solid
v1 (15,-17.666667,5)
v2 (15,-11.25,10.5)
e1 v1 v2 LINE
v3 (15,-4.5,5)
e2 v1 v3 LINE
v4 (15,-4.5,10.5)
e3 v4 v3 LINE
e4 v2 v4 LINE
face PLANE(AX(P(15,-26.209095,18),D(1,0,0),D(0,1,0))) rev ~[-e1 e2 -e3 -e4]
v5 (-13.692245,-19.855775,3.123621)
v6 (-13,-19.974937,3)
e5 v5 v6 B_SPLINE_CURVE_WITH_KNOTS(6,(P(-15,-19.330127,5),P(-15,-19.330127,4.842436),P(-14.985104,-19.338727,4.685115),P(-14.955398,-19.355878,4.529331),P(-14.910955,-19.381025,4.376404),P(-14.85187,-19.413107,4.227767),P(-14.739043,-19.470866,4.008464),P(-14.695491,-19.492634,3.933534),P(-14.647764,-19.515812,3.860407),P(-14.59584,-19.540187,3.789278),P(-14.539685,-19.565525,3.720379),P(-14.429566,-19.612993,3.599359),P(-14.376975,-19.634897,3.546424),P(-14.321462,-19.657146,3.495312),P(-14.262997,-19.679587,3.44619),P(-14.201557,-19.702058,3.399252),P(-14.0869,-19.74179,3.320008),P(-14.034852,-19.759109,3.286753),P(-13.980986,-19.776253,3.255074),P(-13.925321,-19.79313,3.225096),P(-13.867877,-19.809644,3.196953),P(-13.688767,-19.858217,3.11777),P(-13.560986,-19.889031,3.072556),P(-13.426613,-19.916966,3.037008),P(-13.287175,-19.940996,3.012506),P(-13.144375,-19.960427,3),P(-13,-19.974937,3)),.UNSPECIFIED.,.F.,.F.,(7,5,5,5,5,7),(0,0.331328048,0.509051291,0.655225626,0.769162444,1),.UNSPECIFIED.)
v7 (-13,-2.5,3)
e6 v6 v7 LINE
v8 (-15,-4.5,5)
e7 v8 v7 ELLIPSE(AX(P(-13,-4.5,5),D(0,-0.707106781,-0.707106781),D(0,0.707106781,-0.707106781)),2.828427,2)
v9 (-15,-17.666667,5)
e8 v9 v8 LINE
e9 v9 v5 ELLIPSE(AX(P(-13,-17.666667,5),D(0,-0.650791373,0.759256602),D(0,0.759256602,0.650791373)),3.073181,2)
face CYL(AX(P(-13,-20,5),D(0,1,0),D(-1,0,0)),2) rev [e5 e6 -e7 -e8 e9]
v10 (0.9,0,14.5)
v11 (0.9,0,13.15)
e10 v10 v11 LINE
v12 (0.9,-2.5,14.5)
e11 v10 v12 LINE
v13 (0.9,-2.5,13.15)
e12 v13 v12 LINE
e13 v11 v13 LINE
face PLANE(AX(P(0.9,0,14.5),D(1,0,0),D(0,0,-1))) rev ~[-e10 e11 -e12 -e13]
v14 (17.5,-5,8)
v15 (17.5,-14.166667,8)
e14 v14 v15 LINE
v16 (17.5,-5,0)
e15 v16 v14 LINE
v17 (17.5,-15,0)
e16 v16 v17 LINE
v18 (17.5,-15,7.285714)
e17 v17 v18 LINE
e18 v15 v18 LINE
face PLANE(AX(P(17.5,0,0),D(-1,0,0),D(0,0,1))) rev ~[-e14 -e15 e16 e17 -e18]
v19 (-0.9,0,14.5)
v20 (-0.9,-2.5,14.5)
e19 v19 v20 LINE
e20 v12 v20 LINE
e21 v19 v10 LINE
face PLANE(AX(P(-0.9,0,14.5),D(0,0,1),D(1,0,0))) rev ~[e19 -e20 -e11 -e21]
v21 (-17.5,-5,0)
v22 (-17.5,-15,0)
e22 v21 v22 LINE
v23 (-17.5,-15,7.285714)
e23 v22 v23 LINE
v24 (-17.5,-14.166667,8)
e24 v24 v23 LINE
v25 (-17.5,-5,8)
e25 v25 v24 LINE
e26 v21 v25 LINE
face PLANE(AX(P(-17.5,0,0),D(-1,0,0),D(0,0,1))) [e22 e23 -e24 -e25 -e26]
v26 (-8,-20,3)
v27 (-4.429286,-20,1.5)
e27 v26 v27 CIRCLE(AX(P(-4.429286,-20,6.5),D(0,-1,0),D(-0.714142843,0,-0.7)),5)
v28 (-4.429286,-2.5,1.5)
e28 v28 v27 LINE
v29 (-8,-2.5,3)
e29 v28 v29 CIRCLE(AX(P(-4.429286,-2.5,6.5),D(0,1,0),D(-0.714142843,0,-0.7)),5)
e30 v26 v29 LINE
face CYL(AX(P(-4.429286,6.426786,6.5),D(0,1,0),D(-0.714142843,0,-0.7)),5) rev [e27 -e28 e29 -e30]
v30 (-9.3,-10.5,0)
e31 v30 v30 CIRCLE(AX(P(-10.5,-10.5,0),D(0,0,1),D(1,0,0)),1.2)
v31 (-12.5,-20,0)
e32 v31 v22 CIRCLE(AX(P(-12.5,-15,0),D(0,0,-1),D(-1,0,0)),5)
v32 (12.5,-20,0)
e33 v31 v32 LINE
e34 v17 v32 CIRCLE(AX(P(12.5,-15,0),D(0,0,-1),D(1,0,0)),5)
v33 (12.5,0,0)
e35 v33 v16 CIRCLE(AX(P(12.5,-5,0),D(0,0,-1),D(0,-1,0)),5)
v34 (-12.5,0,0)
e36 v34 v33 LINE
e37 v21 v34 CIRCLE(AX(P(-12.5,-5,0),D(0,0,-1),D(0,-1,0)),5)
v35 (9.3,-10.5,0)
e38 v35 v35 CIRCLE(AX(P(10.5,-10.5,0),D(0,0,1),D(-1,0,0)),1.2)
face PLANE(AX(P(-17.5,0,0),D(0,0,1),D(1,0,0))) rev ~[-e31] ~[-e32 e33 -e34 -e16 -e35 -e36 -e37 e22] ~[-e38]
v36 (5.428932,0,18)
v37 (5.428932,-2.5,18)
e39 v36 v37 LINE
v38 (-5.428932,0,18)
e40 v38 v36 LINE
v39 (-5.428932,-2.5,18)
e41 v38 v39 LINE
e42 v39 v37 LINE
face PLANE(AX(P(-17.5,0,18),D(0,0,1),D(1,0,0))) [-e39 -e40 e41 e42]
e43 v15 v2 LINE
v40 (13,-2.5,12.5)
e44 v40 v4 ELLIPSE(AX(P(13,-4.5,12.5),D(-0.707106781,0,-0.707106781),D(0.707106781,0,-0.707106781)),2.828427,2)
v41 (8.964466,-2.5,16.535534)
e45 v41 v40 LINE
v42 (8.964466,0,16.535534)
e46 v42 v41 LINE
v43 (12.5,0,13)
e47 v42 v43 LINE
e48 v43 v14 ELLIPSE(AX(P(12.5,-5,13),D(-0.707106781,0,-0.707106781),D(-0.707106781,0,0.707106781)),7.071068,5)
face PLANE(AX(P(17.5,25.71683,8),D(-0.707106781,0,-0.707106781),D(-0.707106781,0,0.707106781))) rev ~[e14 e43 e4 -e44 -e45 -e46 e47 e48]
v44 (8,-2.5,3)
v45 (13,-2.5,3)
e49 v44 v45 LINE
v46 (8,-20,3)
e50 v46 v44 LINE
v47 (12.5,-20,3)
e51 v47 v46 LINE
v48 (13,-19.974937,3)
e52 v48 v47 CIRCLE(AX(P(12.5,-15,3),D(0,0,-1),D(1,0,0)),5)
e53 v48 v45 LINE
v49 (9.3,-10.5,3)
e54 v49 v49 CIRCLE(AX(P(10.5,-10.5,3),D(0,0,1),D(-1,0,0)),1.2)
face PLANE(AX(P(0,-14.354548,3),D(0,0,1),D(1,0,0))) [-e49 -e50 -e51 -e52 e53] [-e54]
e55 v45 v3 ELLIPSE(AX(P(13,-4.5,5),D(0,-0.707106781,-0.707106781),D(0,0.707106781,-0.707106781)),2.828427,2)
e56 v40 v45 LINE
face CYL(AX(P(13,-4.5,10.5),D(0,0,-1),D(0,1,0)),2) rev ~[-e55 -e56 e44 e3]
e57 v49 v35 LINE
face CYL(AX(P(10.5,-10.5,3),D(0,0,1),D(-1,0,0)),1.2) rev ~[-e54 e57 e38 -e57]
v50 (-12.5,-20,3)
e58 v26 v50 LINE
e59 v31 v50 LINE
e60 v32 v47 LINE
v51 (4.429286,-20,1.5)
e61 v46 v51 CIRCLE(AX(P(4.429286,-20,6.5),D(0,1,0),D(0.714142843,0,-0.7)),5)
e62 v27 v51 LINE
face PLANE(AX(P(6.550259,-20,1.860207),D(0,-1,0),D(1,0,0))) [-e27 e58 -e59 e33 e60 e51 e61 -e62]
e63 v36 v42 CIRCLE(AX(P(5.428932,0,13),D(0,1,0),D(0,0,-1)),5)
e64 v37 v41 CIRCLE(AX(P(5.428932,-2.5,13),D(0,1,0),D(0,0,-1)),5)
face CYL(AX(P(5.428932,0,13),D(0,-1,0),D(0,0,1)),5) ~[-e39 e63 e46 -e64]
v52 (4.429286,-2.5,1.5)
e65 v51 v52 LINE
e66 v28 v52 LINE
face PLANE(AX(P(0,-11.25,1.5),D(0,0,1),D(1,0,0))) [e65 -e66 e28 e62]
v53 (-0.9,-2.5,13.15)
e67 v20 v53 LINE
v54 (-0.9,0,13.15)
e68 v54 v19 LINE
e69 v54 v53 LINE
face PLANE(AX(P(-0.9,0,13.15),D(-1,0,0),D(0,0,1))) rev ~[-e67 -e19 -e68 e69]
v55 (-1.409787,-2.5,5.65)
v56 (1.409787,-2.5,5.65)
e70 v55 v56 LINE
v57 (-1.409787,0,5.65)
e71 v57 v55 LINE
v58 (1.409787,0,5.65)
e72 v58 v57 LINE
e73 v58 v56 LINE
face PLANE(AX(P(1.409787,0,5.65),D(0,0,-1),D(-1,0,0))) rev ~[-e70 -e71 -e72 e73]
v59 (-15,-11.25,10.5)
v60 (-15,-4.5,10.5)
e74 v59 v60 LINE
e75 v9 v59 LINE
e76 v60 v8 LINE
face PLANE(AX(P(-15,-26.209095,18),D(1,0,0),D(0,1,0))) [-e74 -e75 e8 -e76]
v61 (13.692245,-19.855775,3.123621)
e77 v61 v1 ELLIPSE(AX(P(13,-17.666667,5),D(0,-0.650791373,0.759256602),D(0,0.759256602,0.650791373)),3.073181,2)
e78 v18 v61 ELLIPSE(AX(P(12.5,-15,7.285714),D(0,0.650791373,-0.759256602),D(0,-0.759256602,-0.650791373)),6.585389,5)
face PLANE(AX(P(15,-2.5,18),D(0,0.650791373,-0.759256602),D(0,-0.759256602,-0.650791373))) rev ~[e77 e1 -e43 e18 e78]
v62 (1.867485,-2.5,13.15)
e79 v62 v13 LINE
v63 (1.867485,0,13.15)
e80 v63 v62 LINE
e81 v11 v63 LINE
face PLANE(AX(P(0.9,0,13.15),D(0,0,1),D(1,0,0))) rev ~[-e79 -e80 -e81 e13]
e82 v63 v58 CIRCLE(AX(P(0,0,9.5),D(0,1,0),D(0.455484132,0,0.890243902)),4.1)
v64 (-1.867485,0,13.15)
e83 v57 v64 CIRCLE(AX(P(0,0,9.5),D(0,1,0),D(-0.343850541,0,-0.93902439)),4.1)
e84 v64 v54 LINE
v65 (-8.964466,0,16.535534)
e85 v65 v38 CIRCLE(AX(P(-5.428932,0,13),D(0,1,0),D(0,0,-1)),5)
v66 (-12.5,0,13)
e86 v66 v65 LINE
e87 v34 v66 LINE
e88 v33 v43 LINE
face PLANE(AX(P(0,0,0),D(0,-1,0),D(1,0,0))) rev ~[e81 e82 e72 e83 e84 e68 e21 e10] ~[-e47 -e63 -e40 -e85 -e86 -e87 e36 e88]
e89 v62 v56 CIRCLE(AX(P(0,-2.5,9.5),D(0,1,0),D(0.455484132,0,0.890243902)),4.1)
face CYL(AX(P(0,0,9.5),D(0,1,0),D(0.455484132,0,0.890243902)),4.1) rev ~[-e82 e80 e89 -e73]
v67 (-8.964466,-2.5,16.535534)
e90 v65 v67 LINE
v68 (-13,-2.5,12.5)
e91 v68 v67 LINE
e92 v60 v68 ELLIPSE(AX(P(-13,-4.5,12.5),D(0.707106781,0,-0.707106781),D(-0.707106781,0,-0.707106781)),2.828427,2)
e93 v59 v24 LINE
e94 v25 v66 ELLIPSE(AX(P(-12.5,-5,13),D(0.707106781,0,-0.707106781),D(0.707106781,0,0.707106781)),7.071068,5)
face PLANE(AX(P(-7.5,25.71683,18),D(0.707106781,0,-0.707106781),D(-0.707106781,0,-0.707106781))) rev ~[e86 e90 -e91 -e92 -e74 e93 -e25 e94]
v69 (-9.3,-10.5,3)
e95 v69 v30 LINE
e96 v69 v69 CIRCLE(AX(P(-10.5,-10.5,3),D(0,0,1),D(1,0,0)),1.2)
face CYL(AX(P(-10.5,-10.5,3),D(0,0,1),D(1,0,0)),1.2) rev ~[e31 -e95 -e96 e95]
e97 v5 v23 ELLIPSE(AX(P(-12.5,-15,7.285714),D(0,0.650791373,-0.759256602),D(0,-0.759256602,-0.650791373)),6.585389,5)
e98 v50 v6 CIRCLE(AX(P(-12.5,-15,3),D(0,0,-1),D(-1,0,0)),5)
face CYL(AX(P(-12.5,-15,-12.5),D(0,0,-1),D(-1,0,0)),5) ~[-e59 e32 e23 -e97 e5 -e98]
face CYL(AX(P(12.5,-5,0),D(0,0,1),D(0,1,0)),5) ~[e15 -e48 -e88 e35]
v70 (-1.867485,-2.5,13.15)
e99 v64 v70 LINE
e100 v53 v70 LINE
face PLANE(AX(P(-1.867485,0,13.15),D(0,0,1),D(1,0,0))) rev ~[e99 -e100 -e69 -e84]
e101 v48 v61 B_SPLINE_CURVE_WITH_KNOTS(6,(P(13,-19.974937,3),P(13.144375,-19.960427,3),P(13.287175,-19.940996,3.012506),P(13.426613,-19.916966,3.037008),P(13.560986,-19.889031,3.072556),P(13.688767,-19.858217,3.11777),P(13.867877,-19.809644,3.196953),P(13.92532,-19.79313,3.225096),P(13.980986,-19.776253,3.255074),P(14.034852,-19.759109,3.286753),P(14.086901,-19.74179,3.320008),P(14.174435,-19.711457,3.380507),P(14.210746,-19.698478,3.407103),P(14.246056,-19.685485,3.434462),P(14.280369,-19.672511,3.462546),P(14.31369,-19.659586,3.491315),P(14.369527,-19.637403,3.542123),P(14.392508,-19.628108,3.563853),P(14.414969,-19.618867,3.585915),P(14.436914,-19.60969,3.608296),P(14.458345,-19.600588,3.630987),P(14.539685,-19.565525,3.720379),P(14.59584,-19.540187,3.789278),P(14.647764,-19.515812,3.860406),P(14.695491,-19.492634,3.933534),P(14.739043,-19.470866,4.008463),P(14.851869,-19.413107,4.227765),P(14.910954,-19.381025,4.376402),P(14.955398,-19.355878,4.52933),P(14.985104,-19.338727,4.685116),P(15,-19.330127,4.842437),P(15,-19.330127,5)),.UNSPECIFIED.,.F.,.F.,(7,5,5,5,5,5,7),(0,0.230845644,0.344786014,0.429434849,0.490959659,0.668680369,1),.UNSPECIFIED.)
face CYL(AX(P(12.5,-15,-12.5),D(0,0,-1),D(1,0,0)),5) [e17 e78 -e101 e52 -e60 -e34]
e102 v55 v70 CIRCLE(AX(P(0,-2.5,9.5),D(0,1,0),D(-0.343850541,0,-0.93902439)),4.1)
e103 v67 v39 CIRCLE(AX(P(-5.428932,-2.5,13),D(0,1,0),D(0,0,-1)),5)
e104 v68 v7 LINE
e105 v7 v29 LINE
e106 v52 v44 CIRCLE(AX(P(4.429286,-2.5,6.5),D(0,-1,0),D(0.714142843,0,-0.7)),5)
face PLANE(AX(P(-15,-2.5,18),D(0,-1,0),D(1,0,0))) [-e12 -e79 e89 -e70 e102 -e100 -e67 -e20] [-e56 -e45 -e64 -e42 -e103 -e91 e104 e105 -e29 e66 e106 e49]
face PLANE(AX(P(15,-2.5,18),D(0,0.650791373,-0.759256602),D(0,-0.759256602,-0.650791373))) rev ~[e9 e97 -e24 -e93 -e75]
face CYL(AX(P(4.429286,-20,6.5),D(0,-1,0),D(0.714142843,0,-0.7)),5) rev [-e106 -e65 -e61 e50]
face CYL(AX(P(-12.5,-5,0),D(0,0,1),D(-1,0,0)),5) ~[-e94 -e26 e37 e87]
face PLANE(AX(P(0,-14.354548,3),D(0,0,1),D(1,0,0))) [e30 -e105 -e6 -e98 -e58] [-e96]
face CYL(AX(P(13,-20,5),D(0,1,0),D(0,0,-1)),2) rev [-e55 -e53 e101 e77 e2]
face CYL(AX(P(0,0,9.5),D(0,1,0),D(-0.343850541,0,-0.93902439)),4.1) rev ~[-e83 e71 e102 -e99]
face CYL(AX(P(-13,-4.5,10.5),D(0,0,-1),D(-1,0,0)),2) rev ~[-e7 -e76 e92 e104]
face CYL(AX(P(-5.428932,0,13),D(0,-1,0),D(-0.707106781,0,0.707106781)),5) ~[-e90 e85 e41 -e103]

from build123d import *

# Parameters (mm, degrees)
F0_W          = 35
F0_H          = 18
F1_DEPTH      = 20
F2_W          = 30
F2_H          = 23.709095493
F3_DEPTH      = 15
F5_DEPTH      = 32.5
F6_T1_DEPTH   = 53.9336597593
F7_R          = 2
F10_DEPTH     = 25
F11_R         = 5
F12_W         = 16
F12_H         = 17.5
F13_DEPTH     = 1.5
F14_T4_DEPTH  = 26.4267855357
F14_T9_DEPTH  = 26.4267855357
F14_T11_DEPTH = 28
F14_T13_DEPTH = 28
F15_R         = 1.2
F16_DEPTH     = 3.0010001


# Not quite as in the source:
# - a fillet or chamfer that OpenCascade refuses, or shapes differently, is made with other operations: its cross-section is extruded or revolved along the edge and cut away or added


with BuildPart() as f1:
    # F0 (on Front) → F1 (new body)
    with BuildSketch(Plane.XZ):
        with Locations((0, 9)):
            Rectangle(F0_W, F0_H)
    extrude(amount=F1_DEPTH)

    # F2 (on face) → F3 (cut)
    with BuildSketch(Plane.XY.offset(18)):
        with Locations((0, -14.3545477465)):
            Rectangle(F2_W, F2_H)
    extrude(amount=-F3_DEPTH, mode=Mode.SUBTRACT)

    # F4 (on face) → F5 (cut, symmetric)
    with BuildSketch(Plane(origin=(15, 0, 0), x_dir=(0, -1, 0), z_dir=(-1, 0, 0))):
        Polygon((20, 18), (2.5, 18), (20, 3), align=None)
    extrude(amount=F5_DEPTH, both=True, mode=Mode.SUBTRACT)

    # F6: chamfer of 10 on 2 edges, made by hand

    # F6_s2 → F6_t1 (cut)
    with BuildSketch(Plane.XZ.offset(-25.7168298797)):
        Polygon((17.5, 8), (7.5, 18), (17.5, 18), align=None)
        Polygon((-7.5, 18), (-17.5, 8), (-17.5, 18), align=None)
    extrude(amount=F6_T1_DEPTH, mode=Mode.SUBTRACT)

    # F7
    f7_edges = [f1.edges().sort_by_distance(p)[0] for p in [
        (-15, -2.5, 6.75),
        (15, -2.5, 6.75),
        (-15, -11.25, 3),
        (15, -11.25, 3),
    ]]
    fillet(f7_edges, radius=F7_R)

    # F8 (on face) → F10 (cut)
    with BuildSketch(Plane(origin=(0, 0, 0), x_dir=(-1, 0, 0), z_dir=(0, 1, 0))):
        with BuildLine():
            Line((-1.409787218, 5.65), (1.409787218, 5.65))
            ThreePointArc((1.409787218, 5.65), (4.0923866141, 9.2502565294), (1.8674849397, 13.15))
            Line((1.8674849397, 13.15), (0.9, 13.15))
            Line((0.9, 13.15), (0.9, 14.5))
            Line((0.9, 14.5), (-0.9, 14.5))
            Line((-0.9, 14.5), (-0.9, 13.15))
            Line((-0.9, 13.15), (-1.8674849397, 13.15))
            ThreePointArc((-1.8674849397, 13.15), (-4.0923866141, 9.2502565294), (-1.409787218, 5.65))
        make_face()
    extrude(amount=-F10_DEPTH, mode=Mode.SUBTRACT)

    # F11
    f11_edges = [f1.edges().sort_by_distance(p)[0] for p in [
        (7.5, -1.25, 18),
        (-7.5, -1.25, 18),
        (17.5, 0, 4),
        (-17.5, 0, 4),
    ]]
    fillet(f11_edges, radius=F11_R)

    # F12 (on face) → F13 (cut)
    with BuildSketch(Plane.XY.offset(3)):
        with Locations((0, -11.25)):
            Rectangle(F12_W, F12_H)
    extrude(amount=-F13_DEPTH, mode=Mode.SUBTRACT)

    # F14: fillet of radius 5 on 4 edges, made by hand


with BuildPart() as f14_tool2:
    # F14_s3 → F14_t4 (new body)
    with BuildSketch(Plane.XZ.offset(20)):
        with BuildLine():
            ThreePointArc((8, 3), (6.3657774588, 1.8902277714), (4.4292857857, 1.5))
            Line((4.4292857857, 1.5), (8, 1.5))
            Line((8, 1.5), (8, 3))
        make_face()
    extrude(amount=-F14_T4_DEPTH)

    split(bisect_by=Plane.XZ, keep=Keep.TOP)


with BuildPart() as f1_1:
    add(f1.part)

    # F14_t1: union F14_tool2
    add(f14_tool2.part)


with BuildPart() as f14_tool7:
    # F14_s8 → F14_t9 (new body)
    with BuildSketch(Plane.XZ.offset(-6.4267855357)):
        with BuildLine():
            ThreePointArc((-8, 3), (-6.3657774588, 1.8902277714), (-4.4292857857, 1.5))
            Line((-4.4292857857, 1.5), (-8, 1.5))
            Line((-8, 1.5), (-8, 3))
        make_face()
    extrude(amount=F14_T9_DEPTH)

    split(bisect_by=Plane.XZ, keep=Keep.TOP)


with BuildPart() as f1_2:
    add(f1_1.part)

    # F14_t6: union F14_tool7
    add(f14_tool7.part)

    # F14_s12 → F14_t11 (cut)
    with BuildSketch(Plane.XY.offset(-12.5)):
        with BuildLine():
            ThreePointArc((17.5, -15), (16.0355339059, -18.5355339059), (12.5, -20))
            Line((12.5, -20), (17.5, -20))
            Line((17.5, -20), (17.5, -15))
        make_face()
    extrude(amount=F14_T11_DEPTH, mode=Mode.SUBTRACT)

    # F14_s14 → F14_t13 (cut)
    with BuildSketch(Plane.XY.offset(-12.5)):
        with BuildLine():
            ThreePointArc((-17.5, -15), (-16.0355339059, -18.5355339059), (-12.5, -20))
            Line((-12.5, -20), (-17.5, -20))
            Line((-17.5, -20), (-17.5, -15))
        make_face()
    extrude(amount=F14_T13_DEPTH, mode=Mode.SUBTRACT)

    # F15 (on face) → F16 (cut, through all)
    with BuildSketch(Plane.XY.offset(3)):
        with Locations((-10.5, -10.5)):
            Circle(F15_R)
        with BuildLine():
            ThreePointArc((11.7, -10.5), (10.5, -9.3), (9.3, -10.5))
            ThreePointArc((9.3, -10.5), (10.5, -11.7), (11.7, -10.5))
        make_face()
    extrude(amount=-F16_DEPTH, mode=Mode.SUBTRACT)


solid = f1_2.part
